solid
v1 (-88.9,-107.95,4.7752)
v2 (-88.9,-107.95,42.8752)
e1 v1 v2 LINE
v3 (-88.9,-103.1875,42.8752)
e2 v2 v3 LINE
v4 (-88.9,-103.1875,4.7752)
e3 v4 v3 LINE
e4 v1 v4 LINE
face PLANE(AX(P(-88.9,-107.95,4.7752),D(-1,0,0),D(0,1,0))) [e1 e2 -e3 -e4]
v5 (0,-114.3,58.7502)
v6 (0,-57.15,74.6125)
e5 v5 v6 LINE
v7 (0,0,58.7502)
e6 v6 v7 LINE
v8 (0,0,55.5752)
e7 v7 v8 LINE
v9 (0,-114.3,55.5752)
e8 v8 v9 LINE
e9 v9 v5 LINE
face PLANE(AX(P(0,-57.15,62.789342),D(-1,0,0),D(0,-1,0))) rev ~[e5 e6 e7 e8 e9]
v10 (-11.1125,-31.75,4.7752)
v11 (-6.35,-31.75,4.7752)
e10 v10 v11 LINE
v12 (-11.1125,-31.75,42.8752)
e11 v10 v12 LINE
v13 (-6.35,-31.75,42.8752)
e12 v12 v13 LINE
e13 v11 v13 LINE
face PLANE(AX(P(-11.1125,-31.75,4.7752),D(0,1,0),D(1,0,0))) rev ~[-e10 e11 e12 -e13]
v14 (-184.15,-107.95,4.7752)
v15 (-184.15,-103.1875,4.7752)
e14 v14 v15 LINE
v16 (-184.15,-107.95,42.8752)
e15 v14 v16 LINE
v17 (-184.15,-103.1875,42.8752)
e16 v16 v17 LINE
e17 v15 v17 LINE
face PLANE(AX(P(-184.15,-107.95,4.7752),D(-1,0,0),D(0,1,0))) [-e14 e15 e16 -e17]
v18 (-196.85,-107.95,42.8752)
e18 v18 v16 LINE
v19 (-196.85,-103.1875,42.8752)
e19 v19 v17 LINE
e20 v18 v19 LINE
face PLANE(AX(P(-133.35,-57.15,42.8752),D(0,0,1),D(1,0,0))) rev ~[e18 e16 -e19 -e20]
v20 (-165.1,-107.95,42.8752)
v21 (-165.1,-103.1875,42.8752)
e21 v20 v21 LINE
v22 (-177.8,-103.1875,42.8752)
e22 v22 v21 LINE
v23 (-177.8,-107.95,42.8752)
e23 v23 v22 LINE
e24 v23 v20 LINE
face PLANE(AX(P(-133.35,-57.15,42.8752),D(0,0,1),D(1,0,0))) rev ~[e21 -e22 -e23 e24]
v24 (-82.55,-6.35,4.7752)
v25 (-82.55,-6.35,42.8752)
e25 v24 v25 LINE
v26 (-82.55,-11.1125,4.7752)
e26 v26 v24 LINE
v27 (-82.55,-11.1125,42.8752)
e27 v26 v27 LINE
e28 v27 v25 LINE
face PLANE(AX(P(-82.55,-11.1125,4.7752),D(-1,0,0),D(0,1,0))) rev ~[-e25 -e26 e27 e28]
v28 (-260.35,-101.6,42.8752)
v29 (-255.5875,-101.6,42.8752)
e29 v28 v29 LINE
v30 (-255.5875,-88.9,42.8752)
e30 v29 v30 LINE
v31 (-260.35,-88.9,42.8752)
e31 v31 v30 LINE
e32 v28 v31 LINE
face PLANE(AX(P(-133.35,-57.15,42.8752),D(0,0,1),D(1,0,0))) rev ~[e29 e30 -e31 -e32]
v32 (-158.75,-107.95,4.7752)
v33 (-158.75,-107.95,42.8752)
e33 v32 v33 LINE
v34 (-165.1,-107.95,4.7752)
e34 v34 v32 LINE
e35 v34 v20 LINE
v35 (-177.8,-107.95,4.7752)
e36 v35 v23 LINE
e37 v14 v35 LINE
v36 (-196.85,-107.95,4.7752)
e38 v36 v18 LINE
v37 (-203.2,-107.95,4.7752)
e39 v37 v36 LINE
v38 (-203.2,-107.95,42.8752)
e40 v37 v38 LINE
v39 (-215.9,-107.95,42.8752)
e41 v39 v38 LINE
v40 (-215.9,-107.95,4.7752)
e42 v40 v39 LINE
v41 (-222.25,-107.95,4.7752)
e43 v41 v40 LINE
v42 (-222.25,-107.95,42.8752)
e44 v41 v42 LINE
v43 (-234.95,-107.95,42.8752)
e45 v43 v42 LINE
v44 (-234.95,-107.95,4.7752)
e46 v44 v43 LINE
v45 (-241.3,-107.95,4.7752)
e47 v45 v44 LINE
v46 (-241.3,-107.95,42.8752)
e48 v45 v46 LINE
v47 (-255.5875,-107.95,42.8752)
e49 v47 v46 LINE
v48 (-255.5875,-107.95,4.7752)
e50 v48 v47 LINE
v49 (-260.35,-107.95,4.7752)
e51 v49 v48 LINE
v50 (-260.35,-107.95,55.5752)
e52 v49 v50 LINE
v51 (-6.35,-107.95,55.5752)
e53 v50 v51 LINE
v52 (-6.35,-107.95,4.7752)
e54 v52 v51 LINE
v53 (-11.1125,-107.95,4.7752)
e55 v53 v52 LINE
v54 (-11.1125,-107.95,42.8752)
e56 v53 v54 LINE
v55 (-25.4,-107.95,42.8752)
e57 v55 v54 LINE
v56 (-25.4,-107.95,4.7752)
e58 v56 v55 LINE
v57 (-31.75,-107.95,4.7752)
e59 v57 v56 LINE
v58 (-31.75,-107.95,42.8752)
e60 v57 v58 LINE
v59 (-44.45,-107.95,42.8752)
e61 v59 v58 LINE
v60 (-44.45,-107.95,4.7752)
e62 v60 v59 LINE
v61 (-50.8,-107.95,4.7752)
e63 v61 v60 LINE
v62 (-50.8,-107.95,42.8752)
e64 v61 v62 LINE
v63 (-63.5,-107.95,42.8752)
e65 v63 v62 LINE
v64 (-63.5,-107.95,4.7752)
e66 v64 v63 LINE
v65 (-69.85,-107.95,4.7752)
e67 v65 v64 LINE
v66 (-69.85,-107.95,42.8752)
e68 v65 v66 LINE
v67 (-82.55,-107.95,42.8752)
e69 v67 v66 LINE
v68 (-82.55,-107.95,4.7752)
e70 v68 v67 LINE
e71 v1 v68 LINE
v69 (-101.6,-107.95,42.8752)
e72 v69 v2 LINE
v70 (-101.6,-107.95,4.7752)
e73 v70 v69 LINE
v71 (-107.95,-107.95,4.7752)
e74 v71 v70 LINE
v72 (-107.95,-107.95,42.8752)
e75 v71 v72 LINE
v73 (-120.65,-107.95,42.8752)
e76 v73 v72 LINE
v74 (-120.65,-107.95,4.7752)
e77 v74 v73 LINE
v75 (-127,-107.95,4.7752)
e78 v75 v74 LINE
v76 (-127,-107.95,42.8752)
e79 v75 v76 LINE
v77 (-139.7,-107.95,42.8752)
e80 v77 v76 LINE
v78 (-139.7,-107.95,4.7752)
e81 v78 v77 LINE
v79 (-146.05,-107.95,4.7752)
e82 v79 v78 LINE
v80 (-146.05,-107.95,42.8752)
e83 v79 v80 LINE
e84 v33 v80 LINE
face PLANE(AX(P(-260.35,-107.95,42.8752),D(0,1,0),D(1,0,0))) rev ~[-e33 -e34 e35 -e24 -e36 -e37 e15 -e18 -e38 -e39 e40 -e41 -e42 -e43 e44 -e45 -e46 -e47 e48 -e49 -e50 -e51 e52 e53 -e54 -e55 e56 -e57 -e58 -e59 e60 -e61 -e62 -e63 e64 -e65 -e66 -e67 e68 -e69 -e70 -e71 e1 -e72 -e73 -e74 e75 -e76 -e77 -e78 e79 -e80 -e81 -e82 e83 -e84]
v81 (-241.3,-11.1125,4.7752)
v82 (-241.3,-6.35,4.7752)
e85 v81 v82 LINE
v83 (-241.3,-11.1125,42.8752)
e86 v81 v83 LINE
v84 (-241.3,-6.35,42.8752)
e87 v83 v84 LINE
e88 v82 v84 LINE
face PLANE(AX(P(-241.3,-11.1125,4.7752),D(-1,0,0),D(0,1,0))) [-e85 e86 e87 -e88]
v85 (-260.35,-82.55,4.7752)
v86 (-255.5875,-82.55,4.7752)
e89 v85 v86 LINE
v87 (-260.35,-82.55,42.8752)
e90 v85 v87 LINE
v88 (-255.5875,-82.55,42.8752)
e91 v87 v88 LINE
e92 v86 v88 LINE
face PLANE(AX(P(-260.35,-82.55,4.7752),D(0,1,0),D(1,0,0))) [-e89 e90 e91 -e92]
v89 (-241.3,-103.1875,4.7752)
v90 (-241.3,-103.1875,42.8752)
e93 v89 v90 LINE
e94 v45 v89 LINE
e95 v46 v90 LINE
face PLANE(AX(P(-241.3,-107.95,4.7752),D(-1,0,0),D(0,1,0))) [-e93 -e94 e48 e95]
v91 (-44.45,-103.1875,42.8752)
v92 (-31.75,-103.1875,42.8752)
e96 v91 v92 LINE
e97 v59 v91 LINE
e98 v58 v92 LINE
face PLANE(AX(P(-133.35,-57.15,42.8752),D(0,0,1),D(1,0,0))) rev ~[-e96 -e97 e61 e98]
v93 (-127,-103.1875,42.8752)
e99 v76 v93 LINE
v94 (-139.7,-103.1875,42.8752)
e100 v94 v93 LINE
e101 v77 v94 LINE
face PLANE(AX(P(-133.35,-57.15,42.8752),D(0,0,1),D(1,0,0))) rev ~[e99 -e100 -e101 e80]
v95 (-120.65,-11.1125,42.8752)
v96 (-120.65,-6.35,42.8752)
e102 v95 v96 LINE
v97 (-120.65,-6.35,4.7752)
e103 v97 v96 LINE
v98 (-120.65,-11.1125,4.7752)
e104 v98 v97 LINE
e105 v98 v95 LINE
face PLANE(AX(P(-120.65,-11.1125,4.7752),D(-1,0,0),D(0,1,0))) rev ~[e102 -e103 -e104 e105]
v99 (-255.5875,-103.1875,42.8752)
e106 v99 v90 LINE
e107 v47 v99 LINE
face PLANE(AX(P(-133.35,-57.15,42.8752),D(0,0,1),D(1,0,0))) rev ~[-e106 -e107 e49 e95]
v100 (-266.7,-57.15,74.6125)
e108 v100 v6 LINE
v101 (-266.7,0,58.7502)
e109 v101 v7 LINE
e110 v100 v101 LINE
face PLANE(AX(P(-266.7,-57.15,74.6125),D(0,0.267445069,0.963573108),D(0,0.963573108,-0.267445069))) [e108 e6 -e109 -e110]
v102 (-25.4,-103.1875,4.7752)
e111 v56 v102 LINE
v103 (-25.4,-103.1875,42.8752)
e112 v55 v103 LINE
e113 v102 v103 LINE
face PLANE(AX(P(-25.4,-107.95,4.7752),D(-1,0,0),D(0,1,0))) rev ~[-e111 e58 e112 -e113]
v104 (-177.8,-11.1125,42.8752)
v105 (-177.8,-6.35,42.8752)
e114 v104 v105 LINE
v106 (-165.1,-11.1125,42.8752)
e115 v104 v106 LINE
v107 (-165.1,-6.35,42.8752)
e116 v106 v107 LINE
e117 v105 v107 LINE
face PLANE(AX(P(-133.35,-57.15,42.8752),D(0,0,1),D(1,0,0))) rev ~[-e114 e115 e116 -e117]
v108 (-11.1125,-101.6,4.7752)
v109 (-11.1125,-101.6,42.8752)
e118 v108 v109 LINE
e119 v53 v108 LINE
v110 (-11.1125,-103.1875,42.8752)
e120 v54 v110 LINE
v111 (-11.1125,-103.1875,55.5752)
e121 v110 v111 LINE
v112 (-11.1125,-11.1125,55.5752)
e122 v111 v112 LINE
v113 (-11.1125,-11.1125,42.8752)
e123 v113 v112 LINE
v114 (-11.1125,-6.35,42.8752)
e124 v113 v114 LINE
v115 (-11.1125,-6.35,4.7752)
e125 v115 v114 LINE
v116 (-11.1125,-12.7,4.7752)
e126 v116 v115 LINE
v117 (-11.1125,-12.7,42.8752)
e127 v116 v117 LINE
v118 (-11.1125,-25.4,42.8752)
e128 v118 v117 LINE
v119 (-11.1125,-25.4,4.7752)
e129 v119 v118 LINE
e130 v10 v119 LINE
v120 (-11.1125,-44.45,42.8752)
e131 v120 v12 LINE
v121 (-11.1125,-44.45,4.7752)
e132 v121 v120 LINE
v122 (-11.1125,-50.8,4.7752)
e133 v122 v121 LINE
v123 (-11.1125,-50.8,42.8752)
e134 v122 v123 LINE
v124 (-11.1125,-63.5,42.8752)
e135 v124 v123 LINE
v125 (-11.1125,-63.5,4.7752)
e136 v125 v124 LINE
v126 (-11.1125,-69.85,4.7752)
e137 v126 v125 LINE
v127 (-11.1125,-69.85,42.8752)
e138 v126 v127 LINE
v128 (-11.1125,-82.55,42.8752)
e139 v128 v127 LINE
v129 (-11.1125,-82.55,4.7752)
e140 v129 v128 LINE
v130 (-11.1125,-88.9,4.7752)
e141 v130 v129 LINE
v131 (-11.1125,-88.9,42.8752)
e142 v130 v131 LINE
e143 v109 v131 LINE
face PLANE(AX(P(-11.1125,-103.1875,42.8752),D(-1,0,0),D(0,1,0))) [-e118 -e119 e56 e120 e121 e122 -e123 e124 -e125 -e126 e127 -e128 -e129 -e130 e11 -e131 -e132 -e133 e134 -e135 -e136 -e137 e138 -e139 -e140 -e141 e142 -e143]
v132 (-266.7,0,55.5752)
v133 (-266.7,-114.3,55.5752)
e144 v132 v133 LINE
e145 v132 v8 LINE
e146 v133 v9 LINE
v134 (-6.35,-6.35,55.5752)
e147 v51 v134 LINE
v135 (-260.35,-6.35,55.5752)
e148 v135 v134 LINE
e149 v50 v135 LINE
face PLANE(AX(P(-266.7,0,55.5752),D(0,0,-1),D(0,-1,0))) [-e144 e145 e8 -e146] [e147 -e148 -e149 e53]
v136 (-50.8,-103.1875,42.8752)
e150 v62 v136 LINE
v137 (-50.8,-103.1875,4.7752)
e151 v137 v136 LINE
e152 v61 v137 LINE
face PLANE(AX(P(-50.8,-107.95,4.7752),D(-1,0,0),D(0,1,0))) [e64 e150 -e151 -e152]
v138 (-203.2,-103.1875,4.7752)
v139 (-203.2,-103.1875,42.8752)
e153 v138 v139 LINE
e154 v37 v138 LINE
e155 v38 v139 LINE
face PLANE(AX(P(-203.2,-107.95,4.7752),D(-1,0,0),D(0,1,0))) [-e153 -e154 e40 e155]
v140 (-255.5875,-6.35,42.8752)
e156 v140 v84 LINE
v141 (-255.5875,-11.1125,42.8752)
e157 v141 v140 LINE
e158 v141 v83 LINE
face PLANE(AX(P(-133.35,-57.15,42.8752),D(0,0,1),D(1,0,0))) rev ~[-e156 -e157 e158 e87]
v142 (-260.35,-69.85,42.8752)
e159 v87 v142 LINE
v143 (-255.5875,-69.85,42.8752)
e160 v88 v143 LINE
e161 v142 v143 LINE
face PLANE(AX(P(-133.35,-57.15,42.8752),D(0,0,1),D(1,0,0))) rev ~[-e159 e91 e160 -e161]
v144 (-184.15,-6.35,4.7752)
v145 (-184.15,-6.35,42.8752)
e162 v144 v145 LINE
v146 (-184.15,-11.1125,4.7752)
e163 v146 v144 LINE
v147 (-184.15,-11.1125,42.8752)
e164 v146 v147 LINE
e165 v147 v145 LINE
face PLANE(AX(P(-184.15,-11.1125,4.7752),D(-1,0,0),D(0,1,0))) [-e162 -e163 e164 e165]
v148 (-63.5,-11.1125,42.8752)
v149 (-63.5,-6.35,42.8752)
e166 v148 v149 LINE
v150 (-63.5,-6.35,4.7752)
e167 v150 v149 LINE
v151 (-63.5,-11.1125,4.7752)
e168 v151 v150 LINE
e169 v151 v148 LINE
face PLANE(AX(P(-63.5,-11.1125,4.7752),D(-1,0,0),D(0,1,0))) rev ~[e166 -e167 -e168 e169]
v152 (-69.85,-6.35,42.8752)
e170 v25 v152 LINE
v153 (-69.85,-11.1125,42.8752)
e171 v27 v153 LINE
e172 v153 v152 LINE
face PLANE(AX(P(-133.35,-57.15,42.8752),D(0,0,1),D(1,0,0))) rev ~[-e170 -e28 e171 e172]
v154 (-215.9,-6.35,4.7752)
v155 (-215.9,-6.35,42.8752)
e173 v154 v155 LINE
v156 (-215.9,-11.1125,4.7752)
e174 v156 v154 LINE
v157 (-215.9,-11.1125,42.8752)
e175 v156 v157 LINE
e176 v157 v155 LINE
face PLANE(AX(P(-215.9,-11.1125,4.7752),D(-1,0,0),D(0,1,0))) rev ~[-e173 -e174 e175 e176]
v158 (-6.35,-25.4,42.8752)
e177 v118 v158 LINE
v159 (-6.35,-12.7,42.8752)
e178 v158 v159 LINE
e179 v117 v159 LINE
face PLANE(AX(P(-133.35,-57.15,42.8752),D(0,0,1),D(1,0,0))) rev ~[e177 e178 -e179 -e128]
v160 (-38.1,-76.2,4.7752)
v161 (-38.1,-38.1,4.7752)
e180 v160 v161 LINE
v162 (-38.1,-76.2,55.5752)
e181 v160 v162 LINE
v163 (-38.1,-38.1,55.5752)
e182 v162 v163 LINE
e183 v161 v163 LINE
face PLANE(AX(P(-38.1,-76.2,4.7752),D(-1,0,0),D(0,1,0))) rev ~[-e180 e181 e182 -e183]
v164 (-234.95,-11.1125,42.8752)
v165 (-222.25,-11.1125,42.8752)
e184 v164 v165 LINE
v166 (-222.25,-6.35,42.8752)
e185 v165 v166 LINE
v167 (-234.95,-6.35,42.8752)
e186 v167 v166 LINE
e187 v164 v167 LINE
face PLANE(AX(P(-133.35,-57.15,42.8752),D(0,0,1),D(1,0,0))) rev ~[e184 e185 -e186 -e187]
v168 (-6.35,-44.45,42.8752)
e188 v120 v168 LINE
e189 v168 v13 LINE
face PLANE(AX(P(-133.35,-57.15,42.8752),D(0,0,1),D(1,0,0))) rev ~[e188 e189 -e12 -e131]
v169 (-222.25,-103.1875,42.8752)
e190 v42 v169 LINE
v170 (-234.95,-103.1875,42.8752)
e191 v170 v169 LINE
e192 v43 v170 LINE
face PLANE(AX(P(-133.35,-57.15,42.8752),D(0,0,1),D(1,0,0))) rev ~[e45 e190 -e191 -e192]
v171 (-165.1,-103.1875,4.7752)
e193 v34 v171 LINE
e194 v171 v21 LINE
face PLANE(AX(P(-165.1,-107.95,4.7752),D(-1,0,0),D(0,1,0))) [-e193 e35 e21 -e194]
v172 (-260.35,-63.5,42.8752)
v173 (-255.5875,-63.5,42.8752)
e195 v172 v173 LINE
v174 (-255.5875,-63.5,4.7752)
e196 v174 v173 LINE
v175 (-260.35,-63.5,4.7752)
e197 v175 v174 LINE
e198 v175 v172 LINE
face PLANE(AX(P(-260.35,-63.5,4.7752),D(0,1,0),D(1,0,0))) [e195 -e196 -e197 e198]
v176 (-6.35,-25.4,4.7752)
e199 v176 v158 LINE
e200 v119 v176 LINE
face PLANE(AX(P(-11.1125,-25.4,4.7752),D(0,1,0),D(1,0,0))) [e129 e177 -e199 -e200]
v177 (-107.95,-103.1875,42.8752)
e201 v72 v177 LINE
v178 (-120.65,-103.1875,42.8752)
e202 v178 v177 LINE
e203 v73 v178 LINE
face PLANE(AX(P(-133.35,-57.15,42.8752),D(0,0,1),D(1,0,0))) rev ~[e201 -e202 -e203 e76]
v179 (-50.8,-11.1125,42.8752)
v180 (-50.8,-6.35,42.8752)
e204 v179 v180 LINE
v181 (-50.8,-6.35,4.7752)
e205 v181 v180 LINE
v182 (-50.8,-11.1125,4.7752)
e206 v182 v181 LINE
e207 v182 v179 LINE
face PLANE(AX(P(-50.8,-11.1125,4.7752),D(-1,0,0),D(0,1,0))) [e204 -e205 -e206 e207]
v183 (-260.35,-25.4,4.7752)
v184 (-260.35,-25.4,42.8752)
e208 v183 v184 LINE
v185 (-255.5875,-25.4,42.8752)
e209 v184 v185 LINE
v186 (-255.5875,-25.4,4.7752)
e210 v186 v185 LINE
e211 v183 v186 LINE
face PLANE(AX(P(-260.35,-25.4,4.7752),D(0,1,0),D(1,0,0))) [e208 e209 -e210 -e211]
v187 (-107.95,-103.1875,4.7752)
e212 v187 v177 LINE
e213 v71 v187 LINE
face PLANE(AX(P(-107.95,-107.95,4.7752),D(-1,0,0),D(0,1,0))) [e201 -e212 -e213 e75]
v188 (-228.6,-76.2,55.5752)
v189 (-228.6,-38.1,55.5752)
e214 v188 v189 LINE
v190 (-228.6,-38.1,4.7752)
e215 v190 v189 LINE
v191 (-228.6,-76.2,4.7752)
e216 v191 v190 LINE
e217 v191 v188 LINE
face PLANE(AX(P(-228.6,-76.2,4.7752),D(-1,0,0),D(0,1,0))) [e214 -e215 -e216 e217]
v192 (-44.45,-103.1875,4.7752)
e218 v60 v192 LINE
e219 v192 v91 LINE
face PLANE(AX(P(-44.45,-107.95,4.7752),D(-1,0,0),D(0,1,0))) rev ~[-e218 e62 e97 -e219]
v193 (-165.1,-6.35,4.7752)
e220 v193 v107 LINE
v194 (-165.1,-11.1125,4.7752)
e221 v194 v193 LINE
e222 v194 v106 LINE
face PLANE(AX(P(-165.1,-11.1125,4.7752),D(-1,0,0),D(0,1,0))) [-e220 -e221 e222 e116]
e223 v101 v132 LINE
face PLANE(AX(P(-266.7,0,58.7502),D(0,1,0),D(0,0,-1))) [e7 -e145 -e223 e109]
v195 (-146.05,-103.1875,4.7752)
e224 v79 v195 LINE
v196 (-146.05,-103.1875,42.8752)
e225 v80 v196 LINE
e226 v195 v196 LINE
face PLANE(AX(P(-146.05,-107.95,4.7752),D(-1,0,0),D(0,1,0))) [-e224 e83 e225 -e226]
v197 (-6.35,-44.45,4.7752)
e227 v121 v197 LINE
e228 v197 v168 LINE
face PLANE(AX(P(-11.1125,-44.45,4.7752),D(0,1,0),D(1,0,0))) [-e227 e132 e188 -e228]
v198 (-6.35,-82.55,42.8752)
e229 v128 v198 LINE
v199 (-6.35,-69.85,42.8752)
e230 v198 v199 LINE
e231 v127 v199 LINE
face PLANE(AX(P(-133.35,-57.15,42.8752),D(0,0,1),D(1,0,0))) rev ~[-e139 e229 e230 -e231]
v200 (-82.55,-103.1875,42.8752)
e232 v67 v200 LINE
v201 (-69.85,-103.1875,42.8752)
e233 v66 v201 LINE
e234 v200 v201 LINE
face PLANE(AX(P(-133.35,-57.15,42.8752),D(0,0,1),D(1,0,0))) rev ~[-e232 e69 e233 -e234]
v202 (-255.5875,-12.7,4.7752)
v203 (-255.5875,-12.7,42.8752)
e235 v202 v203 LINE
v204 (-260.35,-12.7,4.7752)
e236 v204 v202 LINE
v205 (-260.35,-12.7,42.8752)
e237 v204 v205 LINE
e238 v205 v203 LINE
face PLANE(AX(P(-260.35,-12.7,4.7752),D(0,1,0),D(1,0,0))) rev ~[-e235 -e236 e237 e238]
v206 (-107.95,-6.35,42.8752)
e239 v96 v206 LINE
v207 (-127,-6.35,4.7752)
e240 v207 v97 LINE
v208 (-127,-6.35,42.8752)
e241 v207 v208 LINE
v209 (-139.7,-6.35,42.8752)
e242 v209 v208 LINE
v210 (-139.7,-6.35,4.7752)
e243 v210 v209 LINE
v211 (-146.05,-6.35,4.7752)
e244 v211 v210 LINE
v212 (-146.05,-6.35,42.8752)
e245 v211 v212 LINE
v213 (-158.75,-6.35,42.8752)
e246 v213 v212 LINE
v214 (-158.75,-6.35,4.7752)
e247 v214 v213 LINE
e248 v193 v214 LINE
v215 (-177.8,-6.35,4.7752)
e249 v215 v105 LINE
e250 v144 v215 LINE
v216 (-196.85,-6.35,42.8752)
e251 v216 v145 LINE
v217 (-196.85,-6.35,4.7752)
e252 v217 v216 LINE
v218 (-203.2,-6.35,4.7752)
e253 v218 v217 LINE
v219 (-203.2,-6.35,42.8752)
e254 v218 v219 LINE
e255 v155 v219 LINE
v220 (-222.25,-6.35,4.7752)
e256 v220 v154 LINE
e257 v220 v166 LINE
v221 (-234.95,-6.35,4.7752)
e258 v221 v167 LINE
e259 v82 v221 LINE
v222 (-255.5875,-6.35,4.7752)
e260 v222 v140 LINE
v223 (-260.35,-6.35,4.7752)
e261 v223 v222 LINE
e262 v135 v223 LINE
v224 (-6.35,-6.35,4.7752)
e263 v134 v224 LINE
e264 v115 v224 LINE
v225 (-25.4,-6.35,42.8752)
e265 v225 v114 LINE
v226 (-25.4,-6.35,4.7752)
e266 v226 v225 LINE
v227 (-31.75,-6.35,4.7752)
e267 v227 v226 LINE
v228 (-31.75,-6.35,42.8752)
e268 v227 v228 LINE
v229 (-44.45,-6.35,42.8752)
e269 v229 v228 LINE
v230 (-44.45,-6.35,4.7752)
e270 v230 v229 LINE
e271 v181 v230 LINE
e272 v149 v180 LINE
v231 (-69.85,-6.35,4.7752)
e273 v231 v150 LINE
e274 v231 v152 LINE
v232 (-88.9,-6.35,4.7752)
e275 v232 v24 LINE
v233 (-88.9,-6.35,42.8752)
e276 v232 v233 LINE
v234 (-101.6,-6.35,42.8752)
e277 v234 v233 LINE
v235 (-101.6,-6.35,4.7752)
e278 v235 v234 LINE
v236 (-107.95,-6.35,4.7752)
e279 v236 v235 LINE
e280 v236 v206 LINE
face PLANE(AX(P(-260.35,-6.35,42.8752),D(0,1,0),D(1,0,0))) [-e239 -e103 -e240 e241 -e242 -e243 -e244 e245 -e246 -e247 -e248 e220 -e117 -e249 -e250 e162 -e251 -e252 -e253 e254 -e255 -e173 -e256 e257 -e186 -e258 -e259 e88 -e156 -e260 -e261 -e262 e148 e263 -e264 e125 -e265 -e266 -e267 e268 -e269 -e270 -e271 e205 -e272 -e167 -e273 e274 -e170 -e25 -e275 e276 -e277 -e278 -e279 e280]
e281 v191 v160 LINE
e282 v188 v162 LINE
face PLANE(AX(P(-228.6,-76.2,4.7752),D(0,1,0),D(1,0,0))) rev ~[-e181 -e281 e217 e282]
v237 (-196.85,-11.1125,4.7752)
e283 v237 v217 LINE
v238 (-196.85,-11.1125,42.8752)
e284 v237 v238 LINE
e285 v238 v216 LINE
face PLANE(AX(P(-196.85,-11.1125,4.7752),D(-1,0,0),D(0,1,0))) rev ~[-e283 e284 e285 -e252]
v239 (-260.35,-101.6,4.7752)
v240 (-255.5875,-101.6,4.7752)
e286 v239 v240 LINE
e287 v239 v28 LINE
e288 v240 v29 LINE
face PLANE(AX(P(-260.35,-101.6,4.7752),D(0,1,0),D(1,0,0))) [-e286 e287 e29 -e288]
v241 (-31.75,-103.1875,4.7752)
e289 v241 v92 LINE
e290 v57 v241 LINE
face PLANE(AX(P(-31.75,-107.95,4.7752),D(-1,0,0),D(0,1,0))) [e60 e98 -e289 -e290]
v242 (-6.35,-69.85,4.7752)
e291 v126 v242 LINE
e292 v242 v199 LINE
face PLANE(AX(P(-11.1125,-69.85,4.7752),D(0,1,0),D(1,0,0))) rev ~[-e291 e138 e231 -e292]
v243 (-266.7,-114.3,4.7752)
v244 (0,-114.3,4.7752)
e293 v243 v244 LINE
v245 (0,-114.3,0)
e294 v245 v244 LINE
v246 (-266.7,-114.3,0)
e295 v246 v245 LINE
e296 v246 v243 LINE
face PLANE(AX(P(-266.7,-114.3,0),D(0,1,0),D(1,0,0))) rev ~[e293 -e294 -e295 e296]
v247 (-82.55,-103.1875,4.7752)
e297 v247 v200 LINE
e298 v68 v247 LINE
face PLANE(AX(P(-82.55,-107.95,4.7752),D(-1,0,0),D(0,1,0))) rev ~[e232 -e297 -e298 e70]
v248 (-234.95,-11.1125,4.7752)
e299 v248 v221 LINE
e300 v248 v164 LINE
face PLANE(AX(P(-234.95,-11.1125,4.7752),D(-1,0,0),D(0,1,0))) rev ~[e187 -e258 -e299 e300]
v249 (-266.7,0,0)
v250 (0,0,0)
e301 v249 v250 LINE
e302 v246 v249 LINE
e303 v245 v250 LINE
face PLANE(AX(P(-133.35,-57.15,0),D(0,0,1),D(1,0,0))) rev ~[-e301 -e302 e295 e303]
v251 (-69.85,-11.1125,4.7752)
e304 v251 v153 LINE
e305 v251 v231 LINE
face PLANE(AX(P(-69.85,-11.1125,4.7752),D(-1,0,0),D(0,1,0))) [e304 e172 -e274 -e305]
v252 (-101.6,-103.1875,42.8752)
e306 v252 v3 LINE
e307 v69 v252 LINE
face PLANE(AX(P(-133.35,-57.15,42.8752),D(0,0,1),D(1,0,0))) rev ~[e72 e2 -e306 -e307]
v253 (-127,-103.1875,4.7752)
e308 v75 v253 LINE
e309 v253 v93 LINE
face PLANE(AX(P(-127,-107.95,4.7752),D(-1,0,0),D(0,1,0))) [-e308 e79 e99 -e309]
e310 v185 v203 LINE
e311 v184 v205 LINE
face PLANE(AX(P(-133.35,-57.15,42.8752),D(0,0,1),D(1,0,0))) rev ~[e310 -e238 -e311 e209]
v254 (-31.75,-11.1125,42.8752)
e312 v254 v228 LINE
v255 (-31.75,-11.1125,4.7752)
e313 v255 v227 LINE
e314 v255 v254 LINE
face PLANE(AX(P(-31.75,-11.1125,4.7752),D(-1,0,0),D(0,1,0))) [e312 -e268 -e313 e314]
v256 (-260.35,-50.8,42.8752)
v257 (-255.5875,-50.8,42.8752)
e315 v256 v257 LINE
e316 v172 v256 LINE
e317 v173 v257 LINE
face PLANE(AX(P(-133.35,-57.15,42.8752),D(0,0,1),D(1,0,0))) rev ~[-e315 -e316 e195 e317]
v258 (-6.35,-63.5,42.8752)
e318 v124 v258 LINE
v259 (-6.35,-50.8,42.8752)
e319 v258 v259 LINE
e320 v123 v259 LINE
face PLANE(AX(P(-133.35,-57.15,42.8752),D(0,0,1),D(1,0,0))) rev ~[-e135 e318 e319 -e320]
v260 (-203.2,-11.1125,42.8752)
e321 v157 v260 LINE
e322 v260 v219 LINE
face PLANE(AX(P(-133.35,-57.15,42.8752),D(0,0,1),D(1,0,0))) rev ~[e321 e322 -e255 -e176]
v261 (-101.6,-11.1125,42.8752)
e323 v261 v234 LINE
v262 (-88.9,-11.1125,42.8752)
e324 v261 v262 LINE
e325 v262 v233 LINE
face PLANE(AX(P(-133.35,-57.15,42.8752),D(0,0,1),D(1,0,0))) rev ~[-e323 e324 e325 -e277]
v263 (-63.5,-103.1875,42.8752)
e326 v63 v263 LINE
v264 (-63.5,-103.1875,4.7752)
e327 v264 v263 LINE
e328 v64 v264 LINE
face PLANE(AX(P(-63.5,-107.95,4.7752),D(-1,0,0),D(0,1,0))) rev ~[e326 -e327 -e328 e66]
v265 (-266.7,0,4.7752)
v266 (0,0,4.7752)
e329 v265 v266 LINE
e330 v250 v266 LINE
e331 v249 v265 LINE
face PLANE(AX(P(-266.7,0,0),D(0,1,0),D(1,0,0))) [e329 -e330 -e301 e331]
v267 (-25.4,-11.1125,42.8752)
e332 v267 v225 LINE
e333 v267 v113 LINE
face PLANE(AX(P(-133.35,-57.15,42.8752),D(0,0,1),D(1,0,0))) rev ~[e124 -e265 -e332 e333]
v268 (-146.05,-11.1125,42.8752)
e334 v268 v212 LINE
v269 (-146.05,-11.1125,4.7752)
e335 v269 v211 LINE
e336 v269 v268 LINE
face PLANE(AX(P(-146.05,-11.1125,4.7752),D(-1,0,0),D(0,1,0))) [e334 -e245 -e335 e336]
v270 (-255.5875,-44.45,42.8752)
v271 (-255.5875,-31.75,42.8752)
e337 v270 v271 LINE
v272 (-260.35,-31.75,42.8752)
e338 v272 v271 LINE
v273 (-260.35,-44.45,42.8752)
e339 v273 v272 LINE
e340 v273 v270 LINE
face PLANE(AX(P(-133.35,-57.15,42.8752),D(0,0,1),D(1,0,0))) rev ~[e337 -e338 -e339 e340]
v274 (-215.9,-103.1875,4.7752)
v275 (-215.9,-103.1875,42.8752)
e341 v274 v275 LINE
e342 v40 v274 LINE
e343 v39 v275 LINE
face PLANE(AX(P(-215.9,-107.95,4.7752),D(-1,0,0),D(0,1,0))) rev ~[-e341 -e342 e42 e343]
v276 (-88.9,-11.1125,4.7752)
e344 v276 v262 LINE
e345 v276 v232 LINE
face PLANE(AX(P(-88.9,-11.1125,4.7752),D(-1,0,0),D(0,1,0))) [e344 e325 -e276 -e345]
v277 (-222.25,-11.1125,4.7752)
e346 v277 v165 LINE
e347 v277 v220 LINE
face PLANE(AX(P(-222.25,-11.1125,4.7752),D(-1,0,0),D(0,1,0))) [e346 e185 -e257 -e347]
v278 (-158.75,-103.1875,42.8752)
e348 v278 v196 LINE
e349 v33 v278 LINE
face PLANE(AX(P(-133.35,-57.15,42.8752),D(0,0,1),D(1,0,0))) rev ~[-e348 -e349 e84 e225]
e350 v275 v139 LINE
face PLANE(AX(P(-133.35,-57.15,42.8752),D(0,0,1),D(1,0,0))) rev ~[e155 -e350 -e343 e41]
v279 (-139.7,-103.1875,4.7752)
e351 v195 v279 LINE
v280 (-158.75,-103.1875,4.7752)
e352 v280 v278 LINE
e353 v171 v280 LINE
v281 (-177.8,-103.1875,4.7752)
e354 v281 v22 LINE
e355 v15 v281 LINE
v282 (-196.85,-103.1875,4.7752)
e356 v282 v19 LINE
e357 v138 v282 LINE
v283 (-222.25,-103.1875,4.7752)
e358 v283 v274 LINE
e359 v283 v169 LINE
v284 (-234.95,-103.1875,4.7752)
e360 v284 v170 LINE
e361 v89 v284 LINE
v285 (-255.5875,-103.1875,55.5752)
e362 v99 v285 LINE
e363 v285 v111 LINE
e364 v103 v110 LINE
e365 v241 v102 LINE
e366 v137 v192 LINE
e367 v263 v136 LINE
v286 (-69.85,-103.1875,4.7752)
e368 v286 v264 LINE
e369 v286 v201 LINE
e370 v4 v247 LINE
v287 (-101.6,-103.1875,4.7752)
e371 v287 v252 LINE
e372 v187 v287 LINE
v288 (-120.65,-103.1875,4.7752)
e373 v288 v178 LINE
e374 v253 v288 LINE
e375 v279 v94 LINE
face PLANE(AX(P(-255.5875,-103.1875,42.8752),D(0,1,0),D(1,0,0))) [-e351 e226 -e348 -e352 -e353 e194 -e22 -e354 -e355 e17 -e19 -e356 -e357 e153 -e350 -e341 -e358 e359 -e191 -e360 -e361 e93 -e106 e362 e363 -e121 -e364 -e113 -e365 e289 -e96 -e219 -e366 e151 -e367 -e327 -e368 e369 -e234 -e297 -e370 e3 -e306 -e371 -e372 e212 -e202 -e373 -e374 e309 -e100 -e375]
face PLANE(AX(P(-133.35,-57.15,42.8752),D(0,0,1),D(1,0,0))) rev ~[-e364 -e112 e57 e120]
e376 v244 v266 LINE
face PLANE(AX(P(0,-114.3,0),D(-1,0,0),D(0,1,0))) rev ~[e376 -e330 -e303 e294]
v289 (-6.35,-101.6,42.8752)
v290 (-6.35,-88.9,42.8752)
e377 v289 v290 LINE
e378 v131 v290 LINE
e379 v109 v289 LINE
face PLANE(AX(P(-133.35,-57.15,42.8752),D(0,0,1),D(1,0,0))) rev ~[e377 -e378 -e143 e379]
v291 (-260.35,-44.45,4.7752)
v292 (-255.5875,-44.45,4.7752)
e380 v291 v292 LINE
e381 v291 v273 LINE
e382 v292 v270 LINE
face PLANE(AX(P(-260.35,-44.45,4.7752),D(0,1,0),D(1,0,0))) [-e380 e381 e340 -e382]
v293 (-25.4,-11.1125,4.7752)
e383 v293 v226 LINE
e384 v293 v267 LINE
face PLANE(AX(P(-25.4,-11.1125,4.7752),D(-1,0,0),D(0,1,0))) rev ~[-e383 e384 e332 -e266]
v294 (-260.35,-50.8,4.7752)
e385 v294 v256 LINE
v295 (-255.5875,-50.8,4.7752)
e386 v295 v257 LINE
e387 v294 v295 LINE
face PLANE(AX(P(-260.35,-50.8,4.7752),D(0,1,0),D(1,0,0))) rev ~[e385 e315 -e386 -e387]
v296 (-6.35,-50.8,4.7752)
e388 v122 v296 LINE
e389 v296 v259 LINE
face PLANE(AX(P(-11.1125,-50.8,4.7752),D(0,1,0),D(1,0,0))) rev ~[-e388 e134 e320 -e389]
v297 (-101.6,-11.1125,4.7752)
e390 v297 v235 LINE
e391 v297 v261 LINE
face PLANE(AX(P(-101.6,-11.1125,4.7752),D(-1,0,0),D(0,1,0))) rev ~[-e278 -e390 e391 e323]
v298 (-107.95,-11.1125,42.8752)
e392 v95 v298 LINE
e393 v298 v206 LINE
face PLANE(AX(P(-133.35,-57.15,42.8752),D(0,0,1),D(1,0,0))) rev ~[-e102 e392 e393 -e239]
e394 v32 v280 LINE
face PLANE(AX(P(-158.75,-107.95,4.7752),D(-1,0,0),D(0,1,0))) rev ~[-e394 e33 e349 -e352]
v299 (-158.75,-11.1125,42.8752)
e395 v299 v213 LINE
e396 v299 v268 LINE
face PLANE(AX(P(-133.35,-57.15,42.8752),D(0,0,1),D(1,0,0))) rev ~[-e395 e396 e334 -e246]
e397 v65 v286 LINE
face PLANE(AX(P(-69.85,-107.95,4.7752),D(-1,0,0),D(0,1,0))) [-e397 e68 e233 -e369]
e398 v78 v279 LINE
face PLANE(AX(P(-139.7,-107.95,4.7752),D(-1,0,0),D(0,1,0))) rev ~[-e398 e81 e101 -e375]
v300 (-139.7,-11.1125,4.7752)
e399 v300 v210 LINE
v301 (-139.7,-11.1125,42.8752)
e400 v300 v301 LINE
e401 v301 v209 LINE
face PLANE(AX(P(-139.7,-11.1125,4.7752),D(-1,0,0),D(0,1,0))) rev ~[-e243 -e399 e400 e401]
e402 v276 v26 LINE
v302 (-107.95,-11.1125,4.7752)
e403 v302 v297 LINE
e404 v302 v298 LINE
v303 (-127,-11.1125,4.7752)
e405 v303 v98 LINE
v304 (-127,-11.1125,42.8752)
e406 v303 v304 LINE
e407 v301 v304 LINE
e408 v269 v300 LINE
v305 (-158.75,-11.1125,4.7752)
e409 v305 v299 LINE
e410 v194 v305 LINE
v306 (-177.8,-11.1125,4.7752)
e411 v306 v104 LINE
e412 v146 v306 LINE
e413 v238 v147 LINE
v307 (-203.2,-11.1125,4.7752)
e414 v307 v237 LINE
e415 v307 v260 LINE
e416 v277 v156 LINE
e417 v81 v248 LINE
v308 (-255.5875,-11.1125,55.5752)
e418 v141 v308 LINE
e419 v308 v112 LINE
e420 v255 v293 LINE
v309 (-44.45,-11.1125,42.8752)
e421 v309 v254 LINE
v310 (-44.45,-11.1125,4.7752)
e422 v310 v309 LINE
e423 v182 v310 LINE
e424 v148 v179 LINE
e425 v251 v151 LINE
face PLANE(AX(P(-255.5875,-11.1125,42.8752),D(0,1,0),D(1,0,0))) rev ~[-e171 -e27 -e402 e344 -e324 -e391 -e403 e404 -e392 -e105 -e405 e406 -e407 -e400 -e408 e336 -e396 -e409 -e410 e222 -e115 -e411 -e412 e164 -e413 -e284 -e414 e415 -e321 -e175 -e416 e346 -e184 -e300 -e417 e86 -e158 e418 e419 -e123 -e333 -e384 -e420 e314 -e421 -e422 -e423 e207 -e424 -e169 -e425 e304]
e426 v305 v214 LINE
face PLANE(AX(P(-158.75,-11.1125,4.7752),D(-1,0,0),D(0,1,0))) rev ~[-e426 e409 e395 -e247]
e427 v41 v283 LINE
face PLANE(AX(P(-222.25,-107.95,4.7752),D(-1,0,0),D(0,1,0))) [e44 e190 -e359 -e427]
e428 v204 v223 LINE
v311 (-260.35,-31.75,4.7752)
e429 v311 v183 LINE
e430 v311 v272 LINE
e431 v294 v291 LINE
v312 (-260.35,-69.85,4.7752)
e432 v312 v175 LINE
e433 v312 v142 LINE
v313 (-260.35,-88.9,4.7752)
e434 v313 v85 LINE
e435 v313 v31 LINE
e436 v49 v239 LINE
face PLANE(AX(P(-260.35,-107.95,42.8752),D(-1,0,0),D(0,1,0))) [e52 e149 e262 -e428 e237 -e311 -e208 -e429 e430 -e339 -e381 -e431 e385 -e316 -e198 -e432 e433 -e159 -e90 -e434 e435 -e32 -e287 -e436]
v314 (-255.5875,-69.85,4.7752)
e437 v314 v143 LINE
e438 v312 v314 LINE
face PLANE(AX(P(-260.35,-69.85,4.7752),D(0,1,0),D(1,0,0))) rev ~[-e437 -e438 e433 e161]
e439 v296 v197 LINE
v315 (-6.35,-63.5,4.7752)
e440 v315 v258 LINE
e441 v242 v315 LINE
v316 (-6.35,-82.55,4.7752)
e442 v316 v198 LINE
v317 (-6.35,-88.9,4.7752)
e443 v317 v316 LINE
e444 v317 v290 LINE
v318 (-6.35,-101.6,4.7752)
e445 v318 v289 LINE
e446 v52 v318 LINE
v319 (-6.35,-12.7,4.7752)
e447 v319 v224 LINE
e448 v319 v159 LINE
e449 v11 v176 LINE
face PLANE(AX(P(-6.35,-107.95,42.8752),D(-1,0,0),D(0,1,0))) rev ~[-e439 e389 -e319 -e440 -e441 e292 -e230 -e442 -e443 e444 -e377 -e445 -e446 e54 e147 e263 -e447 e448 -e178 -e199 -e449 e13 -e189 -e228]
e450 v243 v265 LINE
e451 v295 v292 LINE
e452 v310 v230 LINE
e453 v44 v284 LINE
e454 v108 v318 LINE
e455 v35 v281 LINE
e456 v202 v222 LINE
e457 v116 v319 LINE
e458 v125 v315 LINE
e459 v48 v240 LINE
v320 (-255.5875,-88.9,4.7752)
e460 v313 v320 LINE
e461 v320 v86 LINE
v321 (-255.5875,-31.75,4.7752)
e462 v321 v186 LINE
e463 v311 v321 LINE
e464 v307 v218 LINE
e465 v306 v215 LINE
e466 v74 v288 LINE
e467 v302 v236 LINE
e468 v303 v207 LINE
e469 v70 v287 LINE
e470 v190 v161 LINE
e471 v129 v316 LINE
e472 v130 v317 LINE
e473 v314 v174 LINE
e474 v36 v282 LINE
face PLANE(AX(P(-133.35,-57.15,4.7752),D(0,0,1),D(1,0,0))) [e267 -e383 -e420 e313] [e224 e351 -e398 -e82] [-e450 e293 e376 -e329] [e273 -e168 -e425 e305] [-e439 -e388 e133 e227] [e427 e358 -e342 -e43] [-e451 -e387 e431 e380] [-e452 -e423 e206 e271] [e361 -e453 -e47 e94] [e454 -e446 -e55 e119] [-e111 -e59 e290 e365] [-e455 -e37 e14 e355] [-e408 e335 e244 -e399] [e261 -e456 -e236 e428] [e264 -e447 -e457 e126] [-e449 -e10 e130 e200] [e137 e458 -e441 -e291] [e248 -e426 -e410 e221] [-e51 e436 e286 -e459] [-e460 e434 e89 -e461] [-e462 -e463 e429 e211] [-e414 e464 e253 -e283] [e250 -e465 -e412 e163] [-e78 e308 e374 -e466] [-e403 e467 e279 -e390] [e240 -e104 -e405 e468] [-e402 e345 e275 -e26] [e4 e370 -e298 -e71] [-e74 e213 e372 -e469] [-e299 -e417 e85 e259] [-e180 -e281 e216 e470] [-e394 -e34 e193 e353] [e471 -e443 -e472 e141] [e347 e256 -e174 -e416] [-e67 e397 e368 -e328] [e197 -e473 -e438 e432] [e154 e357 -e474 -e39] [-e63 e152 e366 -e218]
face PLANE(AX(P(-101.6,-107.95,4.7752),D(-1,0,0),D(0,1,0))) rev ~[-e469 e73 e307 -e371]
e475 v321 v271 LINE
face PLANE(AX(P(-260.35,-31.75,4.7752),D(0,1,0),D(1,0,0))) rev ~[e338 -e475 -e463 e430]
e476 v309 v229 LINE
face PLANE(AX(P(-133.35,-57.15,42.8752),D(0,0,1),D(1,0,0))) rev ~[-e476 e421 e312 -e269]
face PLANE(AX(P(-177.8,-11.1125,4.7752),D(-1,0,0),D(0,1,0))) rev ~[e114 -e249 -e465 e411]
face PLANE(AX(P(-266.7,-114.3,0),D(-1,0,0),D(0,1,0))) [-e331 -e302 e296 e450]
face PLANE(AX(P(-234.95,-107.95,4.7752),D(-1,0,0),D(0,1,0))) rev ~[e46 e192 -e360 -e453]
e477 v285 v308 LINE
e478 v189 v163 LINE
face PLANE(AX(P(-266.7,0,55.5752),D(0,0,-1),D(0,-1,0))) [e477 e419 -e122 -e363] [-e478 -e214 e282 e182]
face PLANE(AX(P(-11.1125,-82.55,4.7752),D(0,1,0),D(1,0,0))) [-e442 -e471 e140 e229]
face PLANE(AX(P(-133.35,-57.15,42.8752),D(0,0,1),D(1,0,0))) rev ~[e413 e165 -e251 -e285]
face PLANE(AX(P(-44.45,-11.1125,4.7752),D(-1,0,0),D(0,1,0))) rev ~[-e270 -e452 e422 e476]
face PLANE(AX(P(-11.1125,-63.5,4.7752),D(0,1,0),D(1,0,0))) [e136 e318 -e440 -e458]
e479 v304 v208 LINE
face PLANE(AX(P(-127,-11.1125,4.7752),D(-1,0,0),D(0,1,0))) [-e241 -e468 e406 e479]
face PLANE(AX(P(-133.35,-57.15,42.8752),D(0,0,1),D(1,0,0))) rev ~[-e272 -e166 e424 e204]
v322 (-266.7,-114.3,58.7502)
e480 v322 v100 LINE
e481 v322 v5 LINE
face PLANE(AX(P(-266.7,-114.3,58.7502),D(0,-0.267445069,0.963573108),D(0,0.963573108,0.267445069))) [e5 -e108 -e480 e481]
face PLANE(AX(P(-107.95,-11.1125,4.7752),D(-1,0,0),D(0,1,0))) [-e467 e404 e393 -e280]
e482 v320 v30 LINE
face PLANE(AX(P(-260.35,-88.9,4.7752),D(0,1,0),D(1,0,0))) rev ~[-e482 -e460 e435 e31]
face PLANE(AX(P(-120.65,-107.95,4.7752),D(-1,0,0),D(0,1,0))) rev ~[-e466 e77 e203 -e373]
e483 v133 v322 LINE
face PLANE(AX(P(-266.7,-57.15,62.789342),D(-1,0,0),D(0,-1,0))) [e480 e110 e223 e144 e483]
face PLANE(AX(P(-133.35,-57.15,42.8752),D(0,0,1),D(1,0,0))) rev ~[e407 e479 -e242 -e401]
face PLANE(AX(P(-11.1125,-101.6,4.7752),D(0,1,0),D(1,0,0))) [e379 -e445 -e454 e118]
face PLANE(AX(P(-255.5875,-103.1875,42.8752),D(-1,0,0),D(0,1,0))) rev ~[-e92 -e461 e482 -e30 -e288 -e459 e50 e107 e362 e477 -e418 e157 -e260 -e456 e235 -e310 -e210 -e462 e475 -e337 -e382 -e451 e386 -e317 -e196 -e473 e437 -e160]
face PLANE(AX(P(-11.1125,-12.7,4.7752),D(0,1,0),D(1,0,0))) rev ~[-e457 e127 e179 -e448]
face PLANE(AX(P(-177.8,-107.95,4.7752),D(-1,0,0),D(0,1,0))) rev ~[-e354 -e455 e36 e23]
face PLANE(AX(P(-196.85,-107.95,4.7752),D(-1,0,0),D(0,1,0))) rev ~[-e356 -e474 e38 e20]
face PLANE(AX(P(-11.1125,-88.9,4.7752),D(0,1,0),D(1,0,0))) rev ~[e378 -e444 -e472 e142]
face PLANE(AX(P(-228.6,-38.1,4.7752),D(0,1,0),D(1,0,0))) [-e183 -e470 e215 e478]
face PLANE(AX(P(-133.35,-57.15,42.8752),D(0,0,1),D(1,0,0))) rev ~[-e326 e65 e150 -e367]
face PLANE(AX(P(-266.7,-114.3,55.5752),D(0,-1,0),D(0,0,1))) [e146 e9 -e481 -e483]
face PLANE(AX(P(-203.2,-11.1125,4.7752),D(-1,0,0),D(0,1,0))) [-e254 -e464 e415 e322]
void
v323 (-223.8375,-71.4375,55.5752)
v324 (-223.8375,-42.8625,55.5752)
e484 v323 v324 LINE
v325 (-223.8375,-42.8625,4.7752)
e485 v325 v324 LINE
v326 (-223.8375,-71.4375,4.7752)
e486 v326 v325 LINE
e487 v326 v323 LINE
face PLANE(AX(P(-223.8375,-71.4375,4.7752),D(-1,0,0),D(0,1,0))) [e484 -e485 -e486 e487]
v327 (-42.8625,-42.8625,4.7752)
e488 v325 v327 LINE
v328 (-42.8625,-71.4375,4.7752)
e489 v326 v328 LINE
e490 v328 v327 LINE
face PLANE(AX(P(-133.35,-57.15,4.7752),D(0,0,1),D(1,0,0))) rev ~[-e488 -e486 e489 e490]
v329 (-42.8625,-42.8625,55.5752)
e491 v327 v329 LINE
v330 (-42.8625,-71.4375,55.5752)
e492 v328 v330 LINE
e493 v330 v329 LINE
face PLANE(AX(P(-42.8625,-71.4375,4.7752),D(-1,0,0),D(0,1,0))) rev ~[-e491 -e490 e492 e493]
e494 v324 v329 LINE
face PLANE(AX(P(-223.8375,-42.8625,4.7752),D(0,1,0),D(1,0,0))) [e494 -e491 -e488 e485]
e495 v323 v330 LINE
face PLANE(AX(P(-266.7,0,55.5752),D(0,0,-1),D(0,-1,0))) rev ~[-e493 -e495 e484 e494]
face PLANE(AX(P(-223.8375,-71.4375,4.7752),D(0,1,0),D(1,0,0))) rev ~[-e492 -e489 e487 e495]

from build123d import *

# Parameters (mm, degrees)
F0_W     = 266.7
F0_H     = 114.3
F1_DEPTH = 4.7752
F2_W     = 4.7625
F2_H     = 6.35
F2_W_2   = 6.35
F2_H_2   = 4.7625
F3_DEPTH = 38.1
F4_W     = 190.5
F4_H     = 38.1
F4_W_2   = 180.975
F4_H_2   = 28.575
F5_DEPTH = 50.8
F6_W     = 254
F6_H     = 101.6
F6_W_2   = 244.475
F6_H_2   = 92.075
F7_DEPTH = 12.7
F9_DEPTH = 266.7


# Not quite as in the source:
# - a feature names something its author has since deleted; it is built from what else it names


with BuildPart() as f1:
    # F0 (on Top) → F1 (new body)
    with BuildSketch(Plane.XY):
        with Locations((-133.35, -57.15)):
            Rectangle(F0_W, F0_H)
    extrude(amount=F1_DEPTH)

    # F2 (on face) → F3 (join)
    with BuildSketch(Plane.XY.offset(4.7752)):
        with Locations((-257.96875, -104.775)):
            Rectangle(F2_W, F2_H)
        with Locations((-257.96875, -85.725)):
            Rectangle(F2_W, F2_H)
        with Locations((-257.96875, -66.675)):
            Rectangle(F2_W, F2_H)
        with Locations((-257.96875, -47.625)):
            Rectangle(F2_W, F2_H)
        with Locations((-257.96875, -28.575)):
            Rectangle(F2_W, F2_H)
        with Locations((-257.96875, -9.525)):
            Rectangle(F2_W, F2_H)
        with Locations((-238.125, -105.56875)):
            Rectangle(F2_W_2, F2_H_2)
        with Locations((-219.075, -105.56875)):
            Rectangle(F2_W_2, F2_H_2)
        with Locations((-200.025, -105.56875)):
            Rectangle(F2_W_2, F2_H_2)
        with Locations((-180.975, -105.56875)):
            Rectangle(F2_W_2, F2_H_2)
        with Locations((-161.925, -105.56875)):
            Rectangle(F2_W_2, F2_H_2)
        with Locations((-142.875, -105.56875)):
            Rectangle(F2_W_2, F2_H_2)
        with Locations((-123.825, -105.56875)):
            Rectangle(F2_W_2, F2_H_2)
        with Locations((-104.775, -105.56875)):
            Rectangle(F2_W_2, F2_H_2)
        with Locations((-85.725, -105.56875)):
            Rectangle(F2_W_2, F2_H_2)
        with Locations((-66.675, -105.56875)):
            Rectangle(F2_W_2, F2_H_2)
        with Locations((-47.625, -105.56875)):
            Rectangle(F2_W_2, F2_H_2)
        with Locations((-28.575, -105.56875)):
            Rectangle(F2_W_2, F2_H_2)
        with Locations((-8.73125, -104.775)):
            Rectangle(F2_W, F2_H)
        with Locations((-8.73125, -85.725)):
            Rectangle(F2_W, F2_H)
        with Locations((-8.73125, -9.525)):
            Rectangle(F2_W, F2_H)
        with Locations((-8.73125, -28.575)):
            Rectangle(F2_W, F2_H)
        with Locations((-8.73125, -47.625)):
            Rectangle(F2_W, F2_H)
        with Locations((-8.73125, -66.675)):
            Rectangle(F2_W, F2_H)
        with Locations((-123.825, -8.73125)):
            Rectangle(F2_W_2, F2_H_2)
        with Locations((-200.025, -8.73125)):
            Rectangle(F2_W_2, F2_H_2)
        with Locations((-180.975, -8.73125)):
            Rectangle(F2_W_2, F2_H_2)
        with Locations((-28.575, -8.73125)):
            Rectangle(F2_W_2, F2_H_2)
        with Locations((-161.925, -8.73125)):
            Rectangle(F2_W_2, F2_H_2)
        with Locations((-238.125, -8.73125)):
            Rectangle(F2_W_2, F2_H_2)
        with Locations((-85.725, -8.73125)):
            Rectangle(F2_W_2, F2_H_2)
        with Locations((-142.875, -8.73125)):
            Rectangle(F2_W_2, F2_H_2)
        with Locations((-66.675, -8.73125)):
            Rectangle(F2_W_2, F2_H_2)
        with Locations((-219.075, -8.73125)):
            Rectangle(F2_W_2, F2_H_2)
        with Locations((-104.775, -8.73125)):
            Rectangle(F2_W_2, F2_H_2)
        with Locations((-47.625, -8.73125)):
            Rectangle(F2_W_2, F2_H_2)
    extrude(amount=F3_DEPTH)

    # F4 (on face) → F5 (join)
    with BuildSketch(Plane.XY.offset(4.7752)):
        with Locations((-133.35, -57.15)):
            Rectangle(F4_W, F4_H)
        with Locations((-133.35, -57.15)):
            Rectangle(F4_W_2, F4_H_2, mode=Mode.SUBTRACT)
    extrude(amount=F5_DEPTH)

    # F6 (on face) → F7 (join)
    with BuildSketch(Plane.XY.offset(42.8752)):
        with Locations((-133.35, -57.15)):
            Rectangle(F6_W, F6_H)
        with Locations((-133.35, -57.15)):
            Rectangle(F6_W_2, F6_H_2, mode=Mode.SUBTRACT)
    extrude(amount=F7_DEPTH)

    # F8 (on face) → F9 (join, through all)
    with BuildSketch(Plane(origin=(-266.7, 0, 0), x_dir=(0, -1, 0), z_dir=(-1, 0, 0))):
        Polygon((0, 58.7502), (114.3, 58.7502), (57.15, 74.6125), align=None)
        Polygon((6.35, 55.5752), (107.95, 55.5752), (114.3, 55.5752), (114.3, 58.7502), (0, 58.7502), (0, 55.5752), align=None)
    extrude(amount=-F9_DEPTH)


solid = f1.part
